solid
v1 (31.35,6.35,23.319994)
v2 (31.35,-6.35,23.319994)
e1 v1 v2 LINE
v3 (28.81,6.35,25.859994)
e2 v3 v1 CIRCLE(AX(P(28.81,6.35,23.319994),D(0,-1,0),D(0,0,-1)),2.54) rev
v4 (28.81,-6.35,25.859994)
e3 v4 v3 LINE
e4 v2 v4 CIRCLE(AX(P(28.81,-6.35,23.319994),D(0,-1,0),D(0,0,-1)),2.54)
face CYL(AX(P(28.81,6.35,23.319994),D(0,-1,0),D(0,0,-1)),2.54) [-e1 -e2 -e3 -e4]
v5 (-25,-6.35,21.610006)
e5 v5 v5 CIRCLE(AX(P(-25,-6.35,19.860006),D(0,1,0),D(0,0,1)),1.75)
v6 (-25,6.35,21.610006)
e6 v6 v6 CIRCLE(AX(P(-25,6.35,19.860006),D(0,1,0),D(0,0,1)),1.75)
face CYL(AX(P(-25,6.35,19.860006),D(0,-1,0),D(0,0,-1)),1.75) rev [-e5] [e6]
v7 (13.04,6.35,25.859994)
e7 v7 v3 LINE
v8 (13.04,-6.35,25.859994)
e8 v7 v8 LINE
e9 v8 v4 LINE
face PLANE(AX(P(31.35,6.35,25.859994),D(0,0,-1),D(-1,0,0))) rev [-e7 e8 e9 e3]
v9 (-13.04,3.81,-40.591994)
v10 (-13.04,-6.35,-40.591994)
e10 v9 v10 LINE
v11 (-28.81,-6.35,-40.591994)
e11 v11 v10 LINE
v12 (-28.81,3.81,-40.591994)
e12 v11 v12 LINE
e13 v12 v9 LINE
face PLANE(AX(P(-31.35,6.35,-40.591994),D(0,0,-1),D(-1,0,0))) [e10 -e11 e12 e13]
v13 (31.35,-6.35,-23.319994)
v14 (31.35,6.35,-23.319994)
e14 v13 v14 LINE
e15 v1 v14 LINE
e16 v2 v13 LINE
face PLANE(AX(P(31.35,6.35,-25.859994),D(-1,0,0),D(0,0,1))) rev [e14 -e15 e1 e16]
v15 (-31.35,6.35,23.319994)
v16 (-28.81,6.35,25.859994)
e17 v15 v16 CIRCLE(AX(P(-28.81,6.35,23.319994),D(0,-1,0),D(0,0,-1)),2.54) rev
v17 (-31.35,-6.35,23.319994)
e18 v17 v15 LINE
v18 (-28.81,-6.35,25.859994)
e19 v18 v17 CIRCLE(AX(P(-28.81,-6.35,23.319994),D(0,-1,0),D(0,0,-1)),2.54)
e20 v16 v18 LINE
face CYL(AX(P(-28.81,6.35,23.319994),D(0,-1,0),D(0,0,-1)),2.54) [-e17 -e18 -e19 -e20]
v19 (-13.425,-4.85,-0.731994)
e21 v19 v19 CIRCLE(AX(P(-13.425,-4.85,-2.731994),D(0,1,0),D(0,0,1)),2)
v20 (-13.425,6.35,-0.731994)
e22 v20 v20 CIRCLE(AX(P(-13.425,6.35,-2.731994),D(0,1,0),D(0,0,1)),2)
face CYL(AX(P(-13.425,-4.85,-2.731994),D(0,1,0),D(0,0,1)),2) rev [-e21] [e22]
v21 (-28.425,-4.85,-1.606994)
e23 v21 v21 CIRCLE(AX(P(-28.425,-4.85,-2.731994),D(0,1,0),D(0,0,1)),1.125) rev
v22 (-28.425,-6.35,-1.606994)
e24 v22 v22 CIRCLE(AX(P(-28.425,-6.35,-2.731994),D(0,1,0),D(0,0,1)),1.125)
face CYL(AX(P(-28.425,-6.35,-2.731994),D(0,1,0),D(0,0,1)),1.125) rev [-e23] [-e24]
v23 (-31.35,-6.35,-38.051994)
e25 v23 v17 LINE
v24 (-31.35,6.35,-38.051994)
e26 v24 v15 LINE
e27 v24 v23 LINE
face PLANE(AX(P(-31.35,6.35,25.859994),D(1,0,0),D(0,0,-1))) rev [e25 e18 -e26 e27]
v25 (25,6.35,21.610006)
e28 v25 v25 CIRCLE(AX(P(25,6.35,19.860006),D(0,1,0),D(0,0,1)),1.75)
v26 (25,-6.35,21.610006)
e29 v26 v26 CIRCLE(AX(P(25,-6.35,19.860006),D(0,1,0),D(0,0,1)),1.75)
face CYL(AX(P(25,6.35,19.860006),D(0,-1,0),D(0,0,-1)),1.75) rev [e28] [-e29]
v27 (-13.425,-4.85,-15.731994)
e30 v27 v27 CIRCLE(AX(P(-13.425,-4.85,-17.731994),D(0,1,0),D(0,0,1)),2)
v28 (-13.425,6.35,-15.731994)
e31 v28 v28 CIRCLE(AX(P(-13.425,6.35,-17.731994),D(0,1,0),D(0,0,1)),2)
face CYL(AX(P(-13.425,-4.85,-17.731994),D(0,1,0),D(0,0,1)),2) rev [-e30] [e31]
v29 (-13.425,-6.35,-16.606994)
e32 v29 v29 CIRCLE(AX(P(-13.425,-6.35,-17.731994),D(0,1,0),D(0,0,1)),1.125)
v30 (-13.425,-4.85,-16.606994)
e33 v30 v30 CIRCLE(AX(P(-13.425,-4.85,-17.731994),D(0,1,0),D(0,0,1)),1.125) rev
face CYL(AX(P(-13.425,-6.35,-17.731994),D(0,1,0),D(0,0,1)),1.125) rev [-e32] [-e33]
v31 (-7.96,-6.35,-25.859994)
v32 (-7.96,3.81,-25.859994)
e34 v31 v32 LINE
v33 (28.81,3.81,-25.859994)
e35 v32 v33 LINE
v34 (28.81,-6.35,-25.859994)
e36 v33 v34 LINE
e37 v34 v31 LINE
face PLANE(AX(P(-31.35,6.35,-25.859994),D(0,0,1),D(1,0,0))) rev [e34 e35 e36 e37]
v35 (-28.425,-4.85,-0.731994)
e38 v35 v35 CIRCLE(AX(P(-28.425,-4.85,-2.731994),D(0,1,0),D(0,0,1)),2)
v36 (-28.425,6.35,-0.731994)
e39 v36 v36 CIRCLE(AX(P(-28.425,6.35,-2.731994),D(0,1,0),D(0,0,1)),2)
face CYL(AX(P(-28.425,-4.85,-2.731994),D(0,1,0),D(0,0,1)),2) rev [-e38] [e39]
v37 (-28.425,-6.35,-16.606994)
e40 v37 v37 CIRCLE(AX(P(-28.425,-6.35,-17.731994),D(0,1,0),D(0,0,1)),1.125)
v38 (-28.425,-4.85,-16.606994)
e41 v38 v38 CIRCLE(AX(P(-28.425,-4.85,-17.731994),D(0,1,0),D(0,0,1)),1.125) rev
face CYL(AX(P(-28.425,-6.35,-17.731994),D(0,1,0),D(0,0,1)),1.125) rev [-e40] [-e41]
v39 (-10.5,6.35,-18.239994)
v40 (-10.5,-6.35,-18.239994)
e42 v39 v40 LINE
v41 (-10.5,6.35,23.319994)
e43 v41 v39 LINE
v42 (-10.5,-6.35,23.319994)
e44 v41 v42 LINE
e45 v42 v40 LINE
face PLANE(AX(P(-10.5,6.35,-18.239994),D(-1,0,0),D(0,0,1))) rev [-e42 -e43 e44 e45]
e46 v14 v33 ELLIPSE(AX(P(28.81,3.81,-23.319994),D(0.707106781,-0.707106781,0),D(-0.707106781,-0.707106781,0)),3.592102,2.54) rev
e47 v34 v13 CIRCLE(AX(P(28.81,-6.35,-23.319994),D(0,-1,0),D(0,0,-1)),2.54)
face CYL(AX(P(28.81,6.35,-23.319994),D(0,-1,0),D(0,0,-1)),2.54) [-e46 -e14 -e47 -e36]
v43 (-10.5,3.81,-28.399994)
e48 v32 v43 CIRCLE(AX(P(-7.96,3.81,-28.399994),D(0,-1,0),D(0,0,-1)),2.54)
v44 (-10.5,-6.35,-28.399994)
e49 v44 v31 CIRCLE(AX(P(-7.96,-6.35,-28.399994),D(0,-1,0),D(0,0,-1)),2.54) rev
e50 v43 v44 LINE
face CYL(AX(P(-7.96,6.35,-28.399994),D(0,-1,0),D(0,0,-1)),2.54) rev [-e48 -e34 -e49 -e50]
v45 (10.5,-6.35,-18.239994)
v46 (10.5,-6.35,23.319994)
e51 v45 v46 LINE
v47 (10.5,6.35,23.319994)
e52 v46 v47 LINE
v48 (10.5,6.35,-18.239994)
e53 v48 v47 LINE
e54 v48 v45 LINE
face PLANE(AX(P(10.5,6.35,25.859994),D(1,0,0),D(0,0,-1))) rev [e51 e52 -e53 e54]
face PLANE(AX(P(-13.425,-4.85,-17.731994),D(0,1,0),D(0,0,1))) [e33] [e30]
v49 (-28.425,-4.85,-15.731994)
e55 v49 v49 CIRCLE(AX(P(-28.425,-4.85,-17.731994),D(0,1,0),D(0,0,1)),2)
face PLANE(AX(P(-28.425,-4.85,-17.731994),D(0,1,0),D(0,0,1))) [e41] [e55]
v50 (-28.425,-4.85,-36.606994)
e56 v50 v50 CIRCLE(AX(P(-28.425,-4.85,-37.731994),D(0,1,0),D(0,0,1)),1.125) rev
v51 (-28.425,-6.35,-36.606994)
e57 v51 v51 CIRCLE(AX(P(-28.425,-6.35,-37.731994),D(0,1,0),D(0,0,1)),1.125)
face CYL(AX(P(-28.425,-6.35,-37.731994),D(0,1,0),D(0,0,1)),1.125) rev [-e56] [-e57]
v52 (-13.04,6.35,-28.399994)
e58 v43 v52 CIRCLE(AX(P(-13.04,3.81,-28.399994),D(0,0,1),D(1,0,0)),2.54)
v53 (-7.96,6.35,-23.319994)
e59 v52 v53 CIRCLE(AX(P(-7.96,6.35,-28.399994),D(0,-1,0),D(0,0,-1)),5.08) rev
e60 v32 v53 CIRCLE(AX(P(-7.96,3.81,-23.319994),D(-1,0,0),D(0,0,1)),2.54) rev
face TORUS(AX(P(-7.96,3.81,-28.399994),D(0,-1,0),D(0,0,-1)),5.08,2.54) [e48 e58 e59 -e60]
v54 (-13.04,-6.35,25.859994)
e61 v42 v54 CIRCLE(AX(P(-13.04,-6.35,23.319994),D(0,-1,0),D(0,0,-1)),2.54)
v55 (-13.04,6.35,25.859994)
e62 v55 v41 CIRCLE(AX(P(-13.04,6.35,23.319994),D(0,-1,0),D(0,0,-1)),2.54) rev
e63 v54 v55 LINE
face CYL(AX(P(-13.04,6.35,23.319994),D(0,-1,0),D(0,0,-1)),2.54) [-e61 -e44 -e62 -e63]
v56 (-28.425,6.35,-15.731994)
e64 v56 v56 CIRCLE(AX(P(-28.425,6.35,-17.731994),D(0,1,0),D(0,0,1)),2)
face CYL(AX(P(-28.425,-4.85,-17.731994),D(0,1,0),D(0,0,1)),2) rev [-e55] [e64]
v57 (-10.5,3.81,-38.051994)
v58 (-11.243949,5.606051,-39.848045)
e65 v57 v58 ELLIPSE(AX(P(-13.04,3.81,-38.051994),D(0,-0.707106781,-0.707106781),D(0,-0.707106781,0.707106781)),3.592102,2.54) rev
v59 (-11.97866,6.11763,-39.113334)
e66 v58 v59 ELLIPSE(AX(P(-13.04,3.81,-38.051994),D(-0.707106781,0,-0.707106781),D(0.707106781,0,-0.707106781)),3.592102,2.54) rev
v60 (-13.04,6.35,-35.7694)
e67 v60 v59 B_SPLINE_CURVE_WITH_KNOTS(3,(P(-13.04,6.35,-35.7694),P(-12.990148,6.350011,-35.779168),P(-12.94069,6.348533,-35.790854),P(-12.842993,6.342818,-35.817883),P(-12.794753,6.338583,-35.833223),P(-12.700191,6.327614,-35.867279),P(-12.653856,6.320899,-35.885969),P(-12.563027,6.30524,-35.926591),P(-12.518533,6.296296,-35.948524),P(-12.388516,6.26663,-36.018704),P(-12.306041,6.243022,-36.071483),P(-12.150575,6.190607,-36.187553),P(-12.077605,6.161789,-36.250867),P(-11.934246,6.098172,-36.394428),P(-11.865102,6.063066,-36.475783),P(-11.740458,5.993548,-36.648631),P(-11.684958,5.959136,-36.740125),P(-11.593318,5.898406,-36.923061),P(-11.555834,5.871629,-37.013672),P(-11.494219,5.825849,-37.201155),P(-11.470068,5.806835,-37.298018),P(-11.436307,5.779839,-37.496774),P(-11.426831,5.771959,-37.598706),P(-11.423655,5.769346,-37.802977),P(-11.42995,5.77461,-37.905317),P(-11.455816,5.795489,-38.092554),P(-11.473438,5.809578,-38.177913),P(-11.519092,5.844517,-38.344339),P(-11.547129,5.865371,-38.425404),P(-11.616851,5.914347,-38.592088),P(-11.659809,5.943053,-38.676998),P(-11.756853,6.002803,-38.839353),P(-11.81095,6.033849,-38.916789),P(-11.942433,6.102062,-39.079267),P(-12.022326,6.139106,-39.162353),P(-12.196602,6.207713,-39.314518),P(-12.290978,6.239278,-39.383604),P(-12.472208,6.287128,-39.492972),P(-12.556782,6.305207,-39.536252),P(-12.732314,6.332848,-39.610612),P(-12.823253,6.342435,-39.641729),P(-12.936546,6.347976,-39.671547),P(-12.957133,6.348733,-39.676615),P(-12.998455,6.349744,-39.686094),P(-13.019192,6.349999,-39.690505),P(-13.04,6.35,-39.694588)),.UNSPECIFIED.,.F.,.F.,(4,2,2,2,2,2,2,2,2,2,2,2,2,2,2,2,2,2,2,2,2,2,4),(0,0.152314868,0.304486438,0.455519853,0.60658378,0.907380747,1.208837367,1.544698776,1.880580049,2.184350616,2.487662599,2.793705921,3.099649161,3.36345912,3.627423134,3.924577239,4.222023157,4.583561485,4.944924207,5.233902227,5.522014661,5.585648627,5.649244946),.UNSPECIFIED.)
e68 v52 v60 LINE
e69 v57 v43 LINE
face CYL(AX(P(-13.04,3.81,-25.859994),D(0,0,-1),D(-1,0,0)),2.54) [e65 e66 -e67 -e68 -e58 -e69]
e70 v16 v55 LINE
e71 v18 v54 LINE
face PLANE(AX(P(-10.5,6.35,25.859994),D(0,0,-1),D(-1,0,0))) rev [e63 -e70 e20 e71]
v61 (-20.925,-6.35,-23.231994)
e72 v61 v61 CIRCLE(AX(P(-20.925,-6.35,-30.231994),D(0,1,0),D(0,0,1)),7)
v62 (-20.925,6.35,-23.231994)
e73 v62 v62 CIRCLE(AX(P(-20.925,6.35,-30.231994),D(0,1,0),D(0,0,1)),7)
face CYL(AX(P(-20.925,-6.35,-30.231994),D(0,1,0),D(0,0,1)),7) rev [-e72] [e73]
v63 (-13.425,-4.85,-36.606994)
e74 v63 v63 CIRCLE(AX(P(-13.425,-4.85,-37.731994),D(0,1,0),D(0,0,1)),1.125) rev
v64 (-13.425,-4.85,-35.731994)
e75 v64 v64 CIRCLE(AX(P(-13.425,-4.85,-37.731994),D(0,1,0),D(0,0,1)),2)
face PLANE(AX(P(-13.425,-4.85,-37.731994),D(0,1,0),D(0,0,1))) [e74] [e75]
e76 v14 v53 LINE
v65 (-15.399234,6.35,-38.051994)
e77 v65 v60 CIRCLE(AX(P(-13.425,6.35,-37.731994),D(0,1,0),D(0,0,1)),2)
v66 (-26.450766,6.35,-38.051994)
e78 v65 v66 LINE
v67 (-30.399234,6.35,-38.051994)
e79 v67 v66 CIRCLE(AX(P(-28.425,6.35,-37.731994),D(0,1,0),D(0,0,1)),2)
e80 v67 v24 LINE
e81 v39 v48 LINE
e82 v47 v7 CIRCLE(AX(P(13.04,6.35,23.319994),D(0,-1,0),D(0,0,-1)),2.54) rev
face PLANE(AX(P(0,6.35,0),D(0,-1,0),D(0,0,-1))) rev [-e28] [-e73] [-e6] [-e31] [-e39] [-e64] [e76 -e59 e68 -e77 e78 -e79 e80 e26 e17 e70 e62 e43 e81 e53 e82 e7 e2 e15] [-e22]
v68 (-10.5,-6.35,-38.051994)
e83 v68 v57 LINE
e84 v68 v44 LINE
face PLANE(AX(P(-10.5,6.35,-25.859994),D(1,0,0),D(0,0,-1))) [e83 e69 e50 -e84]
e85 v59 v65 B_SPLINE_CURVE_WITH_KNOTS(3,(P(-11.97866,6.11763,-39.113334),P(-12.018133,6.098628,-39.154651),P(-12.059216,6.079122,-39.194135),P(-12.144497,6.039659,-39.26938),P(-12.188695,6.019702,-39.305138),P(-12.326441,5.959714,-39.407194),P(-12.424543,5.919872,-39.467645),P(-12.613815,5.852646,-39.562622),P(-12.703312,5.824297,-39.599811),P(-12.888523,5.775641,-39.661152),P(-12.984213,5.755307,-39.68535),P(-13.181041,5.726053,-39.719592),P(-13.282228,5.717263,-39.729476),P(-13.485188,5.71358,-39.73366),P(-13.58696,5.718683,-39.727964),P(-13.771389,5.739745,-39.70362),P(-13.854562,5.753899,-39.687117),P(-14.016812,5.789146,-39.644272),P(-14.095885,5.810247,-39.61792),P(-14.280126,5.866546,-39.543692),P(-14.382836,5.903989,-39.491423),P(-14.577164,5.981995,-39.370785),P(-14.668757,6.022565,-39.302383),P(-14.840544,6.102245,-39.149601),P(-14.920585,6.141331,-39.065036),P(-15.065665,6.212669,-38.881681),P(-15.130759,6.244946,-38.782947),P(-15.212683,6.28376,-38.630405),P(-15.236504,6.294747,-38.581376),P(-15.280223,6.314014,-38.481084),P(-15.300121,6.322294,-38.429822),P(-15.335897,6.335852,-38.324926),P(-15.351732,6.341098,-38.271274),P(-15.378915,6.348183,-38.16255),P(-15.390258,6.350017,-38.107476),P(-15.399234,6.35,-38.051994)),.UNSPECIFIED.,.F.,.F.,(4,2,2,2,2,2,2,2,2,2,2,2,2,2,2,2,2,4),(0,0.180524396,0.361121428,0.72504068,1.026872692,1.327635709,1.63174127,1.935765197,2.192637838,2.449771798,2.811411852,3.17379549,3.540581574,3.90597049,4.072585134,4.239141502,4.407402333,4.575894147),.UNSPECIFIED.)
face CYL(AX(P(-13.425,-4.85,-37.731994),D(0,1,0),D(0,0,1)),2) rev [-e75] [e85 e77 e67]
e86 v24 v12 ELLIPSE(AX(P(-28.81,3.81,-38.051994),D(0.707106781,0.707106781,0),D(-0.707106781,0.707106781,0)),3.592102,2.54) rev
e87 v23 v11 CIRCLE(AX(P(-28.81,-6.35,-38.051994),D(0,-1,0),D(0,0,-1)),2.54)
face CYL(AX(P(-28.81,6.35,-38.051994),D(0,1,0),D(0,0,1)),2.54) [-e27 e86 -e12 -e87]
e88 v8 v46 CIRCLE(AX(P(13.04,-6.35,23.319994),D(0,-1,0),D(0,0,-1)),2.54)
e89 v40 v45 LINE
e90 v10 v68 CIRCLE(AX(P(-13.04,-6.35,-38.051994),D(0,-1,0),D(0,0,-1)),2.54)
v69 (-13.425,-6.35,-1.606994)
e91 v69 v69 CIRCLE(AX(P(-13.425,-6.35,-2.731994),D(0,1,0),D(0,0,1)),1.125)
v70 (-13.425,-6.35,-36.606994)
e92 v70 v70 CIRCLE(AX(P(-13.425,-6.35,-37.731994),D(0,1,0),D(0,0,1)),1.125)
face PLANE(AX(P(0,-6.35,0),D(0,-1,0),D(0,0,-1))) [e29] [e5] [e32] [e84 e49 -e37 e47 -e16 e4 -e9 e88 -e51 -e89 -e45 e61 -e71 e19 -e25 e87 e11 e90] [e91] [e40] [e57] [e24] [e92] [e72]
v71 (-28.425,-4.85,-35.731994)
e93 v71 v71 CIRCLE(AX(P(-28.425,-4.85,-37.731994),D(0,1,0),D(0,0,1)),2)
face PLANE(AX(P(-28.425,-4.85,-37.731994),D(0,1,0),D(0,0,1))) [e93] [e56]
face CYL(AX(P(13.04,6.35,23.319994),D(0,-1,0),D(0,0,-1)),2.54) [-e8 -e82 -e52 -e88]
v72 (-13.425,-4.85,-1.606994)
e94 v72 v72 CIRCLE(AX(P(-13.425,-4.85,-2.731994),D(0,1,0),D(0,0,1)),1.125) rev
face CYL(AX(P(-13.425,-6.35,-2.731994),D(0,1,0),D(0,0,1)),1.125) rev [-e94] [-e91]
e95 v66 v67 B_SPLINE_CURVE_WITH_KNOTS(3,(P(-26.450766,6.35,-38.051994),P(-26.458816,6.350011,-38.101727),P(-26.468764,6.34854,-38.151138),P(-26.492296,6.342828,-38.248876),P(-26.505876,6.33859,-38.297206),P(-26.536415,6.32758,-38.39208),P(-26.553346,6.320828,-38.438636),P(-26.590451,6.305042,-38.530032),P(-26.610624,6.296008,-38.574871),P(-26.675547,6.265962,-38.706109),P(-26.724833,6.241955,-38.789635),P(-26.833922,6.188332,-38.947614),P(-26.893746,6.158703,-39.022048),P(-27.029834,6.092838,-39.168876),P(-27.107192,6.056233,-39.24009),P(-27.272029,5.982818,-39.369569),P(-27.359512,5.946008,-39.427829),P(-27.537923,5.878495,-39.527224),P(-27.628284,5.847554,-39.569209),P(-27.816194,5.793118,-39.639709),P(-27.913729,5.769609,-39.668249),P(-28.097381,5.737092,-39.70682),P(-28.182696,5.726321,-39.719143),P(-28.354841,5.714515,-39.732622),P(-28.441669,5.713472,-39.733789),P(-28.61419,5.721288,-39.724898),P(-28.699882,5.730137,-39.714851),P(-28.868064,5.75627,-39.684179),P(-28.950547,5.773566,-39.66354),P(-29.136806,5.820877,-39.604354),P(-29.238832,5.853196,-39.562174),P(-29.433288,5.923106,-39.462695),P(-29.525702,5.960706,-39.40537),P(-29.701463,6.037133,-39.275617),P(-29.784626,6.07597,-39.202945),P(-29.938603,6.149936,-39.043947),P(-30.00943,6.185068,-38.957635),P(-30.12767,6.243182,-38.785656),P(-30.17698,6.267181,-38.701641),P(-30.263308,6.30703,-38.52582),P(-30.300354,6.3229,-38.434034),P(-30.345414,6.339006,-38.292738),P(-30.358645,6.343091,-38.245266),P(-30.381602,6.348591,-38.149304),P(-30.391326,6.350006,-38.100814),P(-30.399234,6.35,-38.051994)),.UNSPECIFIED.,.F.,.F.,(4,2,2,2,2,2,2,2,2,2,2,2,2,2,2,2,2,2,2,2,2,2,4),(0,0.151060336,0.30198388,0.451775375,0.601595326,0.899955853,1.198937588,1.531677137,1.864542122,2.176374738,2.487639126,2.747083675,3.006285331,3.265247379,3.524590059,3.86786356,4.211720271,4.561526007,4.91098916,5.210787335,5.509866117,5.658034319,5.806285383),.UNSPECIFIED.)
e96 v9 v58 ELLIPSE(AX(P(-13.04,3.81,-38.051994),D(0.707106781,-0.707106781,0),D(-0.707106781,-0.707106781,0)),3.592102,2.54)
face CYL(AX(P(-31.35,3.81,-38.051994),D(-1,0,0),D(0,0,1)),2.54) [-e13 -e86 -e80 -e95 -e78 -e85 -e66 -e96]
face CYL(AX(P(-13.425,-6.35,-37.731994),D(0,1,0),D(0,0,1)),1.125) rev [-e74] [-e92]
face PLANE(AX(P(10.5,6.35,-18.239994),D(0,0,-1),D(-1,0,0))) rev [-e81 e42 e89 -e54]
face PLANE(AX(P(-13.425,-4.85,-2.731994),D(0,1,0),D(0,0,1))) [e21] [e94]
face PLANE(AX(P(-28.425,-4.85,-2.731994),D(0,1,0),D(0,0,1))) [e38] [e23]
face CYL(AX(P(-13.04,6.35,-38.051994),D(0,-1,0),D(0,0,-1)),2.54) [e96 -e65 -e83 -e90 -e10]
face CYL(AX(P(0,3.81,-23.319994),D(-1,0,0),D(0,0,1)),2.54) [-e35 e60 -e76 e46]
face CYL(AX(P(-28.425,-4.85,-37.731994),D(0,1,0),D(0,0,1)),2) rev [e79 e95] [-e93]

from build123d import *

# Parameters (mm, degrees)
SKETCH1_R           = 1.75
BOSS_EXTRUDE1_DEPTH = 6.35
SKETCH5_W           = 20.85
SKETCH5_H           = 14.732
BOSS_EXTRUDE2_DEPTH = 12.7
SKETCH2_R           = 1.125
CUT_EXTRUDE1_DEPTH  = 53.837699391
SKETCH3_R           = 2
CUT_EXTRUDE2_DEPTH  = 11.2
FILLET1_R           = 2.54
FILLET2_R           = 2.54
SKETCH6_R           = 7
CUT_EXTRUDE3_DEPTH  = 53.837699527


with BuildPart() as part:
    # Sketch1 → Boss-Extrude1 (new, symmetric)
    with BuildSketch(Plane(origin=(0, 0, 0), x_dir=(1, 0, 0), z_dir=(0, 1, 0))):
        Polygon((-31.35, -25.859994), (-31.35, 25.859994), (31.35, 25.859994), (31.35, -25.859994), (10.5, -25.859994), (10.5, 18.239994), (-10.5, 18.239994), (-10.5, -25.859994), align=None)
        with Locations(Location((-25, -19.860006, 0), (0, 0, 270))):
            Circle(SKETCH1_R, mode=Mode.SUBTRACT)
        with Locations(Location((25, -19.860006, 0), (0, 0, 270))):
            Circle(SKETCH1_R, mode=Mode.SUBTRACT)
    extrude(amount=BOSS_EXTRUDE1_DEPTH, both=True)

    # Sketch5 → Boss-Extrude2 (add, through all)
    with BuildSketch(Plane.XZ.offset(6.35)):
        with Locations((-20.925, -33.225994)):
            Rectangle(SKETCH5_W, SKETCH5_H)
    extrude(amount=-BOSS_EXTRUDE2_DEPTH)

    # Sketch2 → Cut-Extrude1 (cut, through all)
    with BuildSketch(Plane(origin=(0, 6.35, 0), x_dir=(1, 0, 0), z_dir=(0, 1, 0))):
        with Locations(Location((-28.425, 17.731994, 0), (0, 0, 270))):
            Circle(SKETCH2_R)
        with Locations(Location((-13.425, 17.731994, 0), (0, 0, 270))):
            Circle(SKETCH2_R)
        with Locations(Location((-13.425, 2.731994, 0), (0, 0, 270))):
            Circle(SKETCH2_R)
        with Locations(Location((-28.425, 2.731994, 0), (0, 0, 270))):
            Circle(SKETCH2_R)
        with Locations(Location((-13.425, 37.731994, 0), (0, 0, 270))):
            Circle(SKETCH2_R)
        with Locations(Location((-28.425, 37.731994, 0), (0, 0, 270))):
            Circle(SKETCH2_R)
    extrude(amount=-CUT_EXTRUDE1_DEPTH, mode=Mode.SUBTRACT)

    # Sketch3 → Cut-Extrude2 (cut)
    with BuildSketch(Plane(origin=(0, 6.35, 0), x_dir=(1, 0, 0), z_dir=(0, 1, 0))):
        with Locations(Location((-28.425, 17.731994, 0), (0, 0, 270))):
            Circle(SKETCH3_R)
        with Locations(Location((-13.425, 17.731994, 0), (0, 0, 270))):
            Circle(SKETCH3_R)
        with Locations(Location((-13.425, 2.731994, 0), (0, 0, 270))):
            Circle(SKETCH3_R)
        with Locations(Location((-28.425, 2.731994, 0), (0, 0, 270))):
            Circle(SKETCH3_R)
        with Locations(Location((-28.425, 37.731994, 0), (0, 0, 270))):
            Circle(SKETCH3_R)
        with Locations(Location((-13.425, 37.731994, 0), (0, 0, 270))):
            Circle(SKETCH3_R)
    extrude(amount=-CUT_EXTRUDE2_DEPTH, mode=Mode.SUBTRACT)

    # Fillet1
    # the kernel refuses this fillet: 2.54 mm, written as the material it adds along each edge
    with BuildSketch(Plane(origin=(-10.5, -6.35, -25.859994), x_dir=(0, 0, -1), z_dir=(0, 1, 0))) as fillet1_piece_1:
        with BuildLine():
            CenterArc((FILLET1_R, -FILLET1_R), FILLET1_R, 90, 90)
            Line((0, -FILLET1_R), (0, 0))
            Line((0, 0), (FILLET1_R, 0))
        make_face()
    extrude(amount=12.7)
    # the kernel refuses this fillet: 2.54 mm, written as the material it takes off along each edge
    with BuildSketch(Plane(origin=(-31.35, -12.7, 25.859994), x_dir=(0, 0, -1), z_dir=(0, 1, 0)), Plane(origin=(31.35, 12.7, -25.859994), x_dir=(-1, 0, 0), z_dir=(0, -1, 0)), Plane(origin=(31.35, 12.7, 25.859994), x_dir=(0, 0, -1), z_dir=(0, -1, 0)), Plane(origin=(-10.5, -12.7, 25.859994), x_dir=(-1, 0, 0), z_dir=(0, 1, 0))) as fillet1_2_piece_1:
        with BuildLine():
            CenterArc((FILLET1_R, -FILLET1_R), FILLET1_R, 90, 90)
            Line((0, -FILLET1_R), (0, 0))
            Line((0, 0), (FILLET1_R, 0))
        make_face()
    extrude(amount=25.4, mode=Mode.SUBTRACT)
    with BuildSketch(Plane(origin=(10.5, 12.7, 25.859994), x_dir=(0, 0, -1), z_dir=(0, -1, 0)), Plane(origin=(-31.35, -12.7, -40.591994), x_dir=(0, 0, 1), z_dir=(0, 1, 0)), Plane(origin=(-10.5, -12.7, -40.591994), x_dir=(-1, 0, 0), z_dir=(0, 1, 0))) as fillet1_2_piece_2:
        with BuildLine():
            CenterArc((FILLET1_R, FILLET1_R), FILLET1_R, 180, 90)
            Line((0, FILLET1_R), (0, 0))
            Line((0, 0), (FILLET1_R, 0))
        make_face()
    extrude(amount=25.4, mode=Mode.SUBTRACT)
    with BuildSketch(Plane(origin=(-7.96, 6.35, -25.859994), x_dir=(0, 0, 1), z_dir=(1, 0, 0))) as fillet1_2_piece_3:
        with BuildLine():
            CenterArc((FILLET1_R, FILLET1_R), FILLET1_R, 180, 90)
            Line((0, FILLET1_R), (0, 0))
            Line((0, 0), (FILLET1_R, 0))
        make_face()
    extrude(amount=45.66, mode=Mode.SUBTRACT)
    with BuildSketch(Plane(origin=(-10.5, 6.35, -28.399994), x_dir=(-1, 0, 0), z_dir=(0, 0, -1))) as fillet1_2_piece_4:
        with BuildLine():
            CenterArc((FILLET1_R, -FILLET1_R), FILLET1_R, 90, 90)
            Line((0, -FILLET1_R), (0, 0))
            Line((0, 0), (FILLET1_R, 0))
        make_face()
    extrude(amount=18.542, mode=Mode.SUBTRACT)
    with BuildSketch(Plane(origin=(-7.96, 6.35, -28.399994), x_dir=(-1, 0, 0), z_dir=(0, 0, -1))) as fillet1_2_piece_5:
        with BuildLine():
            CenterArc((2.54 + FILLET1_R, -FILLET1_R), FILLET1_R, 90, 90)
            Line((2.54, -FILLET1_R), (2.54, 0))
            Line((2.54, 0), (2.54 + FILLET1_R, 0))
        make_face()
    revolve(axis=Axis((-7.96, 6.35, -28.399994), (0, 1, 0)), revolution_arc=90, mode=Mode.SUBTRACT)

    # Fillet2
    # the kernel refuses this fillet: 2.54 mm, written as the material it takes off along each edge
    with BuildSketch(Plane(origin=(-6.69, 6.35, -40.591994), x_dir=(0, -1, 0), z_dir=(-1, 0, 0))) as fillet2_piece_1:
        with BuildLine():
            CenterArc((FILLET2_R, FILLET2_R), FILLET2_R, 180, 90)
            Line((0, FILLET2_R), (0, 0))
            Line((0, 0), (FILLET2_R, 0))
        make_face()
    extrude(amount=28.47, mode=Mode.SUBTRACT)

    # Sketch6 → Cut-Extrude3 (cut, through all)
    with BuildSketch(Plane(origin=(0, 6.35, 0), x_dir=(1, 0, 0), z_dir=(0, 1, 0))):
        with Locations(Location((-20.925, 30.231994, 0), (0, 0, 270))):
            Circle(SKETCH6_R)
    extrude(amount=-CUT_EXTRUDE3_DEPTH, mode=Mode.SUBTRACT)


solid = part.part
